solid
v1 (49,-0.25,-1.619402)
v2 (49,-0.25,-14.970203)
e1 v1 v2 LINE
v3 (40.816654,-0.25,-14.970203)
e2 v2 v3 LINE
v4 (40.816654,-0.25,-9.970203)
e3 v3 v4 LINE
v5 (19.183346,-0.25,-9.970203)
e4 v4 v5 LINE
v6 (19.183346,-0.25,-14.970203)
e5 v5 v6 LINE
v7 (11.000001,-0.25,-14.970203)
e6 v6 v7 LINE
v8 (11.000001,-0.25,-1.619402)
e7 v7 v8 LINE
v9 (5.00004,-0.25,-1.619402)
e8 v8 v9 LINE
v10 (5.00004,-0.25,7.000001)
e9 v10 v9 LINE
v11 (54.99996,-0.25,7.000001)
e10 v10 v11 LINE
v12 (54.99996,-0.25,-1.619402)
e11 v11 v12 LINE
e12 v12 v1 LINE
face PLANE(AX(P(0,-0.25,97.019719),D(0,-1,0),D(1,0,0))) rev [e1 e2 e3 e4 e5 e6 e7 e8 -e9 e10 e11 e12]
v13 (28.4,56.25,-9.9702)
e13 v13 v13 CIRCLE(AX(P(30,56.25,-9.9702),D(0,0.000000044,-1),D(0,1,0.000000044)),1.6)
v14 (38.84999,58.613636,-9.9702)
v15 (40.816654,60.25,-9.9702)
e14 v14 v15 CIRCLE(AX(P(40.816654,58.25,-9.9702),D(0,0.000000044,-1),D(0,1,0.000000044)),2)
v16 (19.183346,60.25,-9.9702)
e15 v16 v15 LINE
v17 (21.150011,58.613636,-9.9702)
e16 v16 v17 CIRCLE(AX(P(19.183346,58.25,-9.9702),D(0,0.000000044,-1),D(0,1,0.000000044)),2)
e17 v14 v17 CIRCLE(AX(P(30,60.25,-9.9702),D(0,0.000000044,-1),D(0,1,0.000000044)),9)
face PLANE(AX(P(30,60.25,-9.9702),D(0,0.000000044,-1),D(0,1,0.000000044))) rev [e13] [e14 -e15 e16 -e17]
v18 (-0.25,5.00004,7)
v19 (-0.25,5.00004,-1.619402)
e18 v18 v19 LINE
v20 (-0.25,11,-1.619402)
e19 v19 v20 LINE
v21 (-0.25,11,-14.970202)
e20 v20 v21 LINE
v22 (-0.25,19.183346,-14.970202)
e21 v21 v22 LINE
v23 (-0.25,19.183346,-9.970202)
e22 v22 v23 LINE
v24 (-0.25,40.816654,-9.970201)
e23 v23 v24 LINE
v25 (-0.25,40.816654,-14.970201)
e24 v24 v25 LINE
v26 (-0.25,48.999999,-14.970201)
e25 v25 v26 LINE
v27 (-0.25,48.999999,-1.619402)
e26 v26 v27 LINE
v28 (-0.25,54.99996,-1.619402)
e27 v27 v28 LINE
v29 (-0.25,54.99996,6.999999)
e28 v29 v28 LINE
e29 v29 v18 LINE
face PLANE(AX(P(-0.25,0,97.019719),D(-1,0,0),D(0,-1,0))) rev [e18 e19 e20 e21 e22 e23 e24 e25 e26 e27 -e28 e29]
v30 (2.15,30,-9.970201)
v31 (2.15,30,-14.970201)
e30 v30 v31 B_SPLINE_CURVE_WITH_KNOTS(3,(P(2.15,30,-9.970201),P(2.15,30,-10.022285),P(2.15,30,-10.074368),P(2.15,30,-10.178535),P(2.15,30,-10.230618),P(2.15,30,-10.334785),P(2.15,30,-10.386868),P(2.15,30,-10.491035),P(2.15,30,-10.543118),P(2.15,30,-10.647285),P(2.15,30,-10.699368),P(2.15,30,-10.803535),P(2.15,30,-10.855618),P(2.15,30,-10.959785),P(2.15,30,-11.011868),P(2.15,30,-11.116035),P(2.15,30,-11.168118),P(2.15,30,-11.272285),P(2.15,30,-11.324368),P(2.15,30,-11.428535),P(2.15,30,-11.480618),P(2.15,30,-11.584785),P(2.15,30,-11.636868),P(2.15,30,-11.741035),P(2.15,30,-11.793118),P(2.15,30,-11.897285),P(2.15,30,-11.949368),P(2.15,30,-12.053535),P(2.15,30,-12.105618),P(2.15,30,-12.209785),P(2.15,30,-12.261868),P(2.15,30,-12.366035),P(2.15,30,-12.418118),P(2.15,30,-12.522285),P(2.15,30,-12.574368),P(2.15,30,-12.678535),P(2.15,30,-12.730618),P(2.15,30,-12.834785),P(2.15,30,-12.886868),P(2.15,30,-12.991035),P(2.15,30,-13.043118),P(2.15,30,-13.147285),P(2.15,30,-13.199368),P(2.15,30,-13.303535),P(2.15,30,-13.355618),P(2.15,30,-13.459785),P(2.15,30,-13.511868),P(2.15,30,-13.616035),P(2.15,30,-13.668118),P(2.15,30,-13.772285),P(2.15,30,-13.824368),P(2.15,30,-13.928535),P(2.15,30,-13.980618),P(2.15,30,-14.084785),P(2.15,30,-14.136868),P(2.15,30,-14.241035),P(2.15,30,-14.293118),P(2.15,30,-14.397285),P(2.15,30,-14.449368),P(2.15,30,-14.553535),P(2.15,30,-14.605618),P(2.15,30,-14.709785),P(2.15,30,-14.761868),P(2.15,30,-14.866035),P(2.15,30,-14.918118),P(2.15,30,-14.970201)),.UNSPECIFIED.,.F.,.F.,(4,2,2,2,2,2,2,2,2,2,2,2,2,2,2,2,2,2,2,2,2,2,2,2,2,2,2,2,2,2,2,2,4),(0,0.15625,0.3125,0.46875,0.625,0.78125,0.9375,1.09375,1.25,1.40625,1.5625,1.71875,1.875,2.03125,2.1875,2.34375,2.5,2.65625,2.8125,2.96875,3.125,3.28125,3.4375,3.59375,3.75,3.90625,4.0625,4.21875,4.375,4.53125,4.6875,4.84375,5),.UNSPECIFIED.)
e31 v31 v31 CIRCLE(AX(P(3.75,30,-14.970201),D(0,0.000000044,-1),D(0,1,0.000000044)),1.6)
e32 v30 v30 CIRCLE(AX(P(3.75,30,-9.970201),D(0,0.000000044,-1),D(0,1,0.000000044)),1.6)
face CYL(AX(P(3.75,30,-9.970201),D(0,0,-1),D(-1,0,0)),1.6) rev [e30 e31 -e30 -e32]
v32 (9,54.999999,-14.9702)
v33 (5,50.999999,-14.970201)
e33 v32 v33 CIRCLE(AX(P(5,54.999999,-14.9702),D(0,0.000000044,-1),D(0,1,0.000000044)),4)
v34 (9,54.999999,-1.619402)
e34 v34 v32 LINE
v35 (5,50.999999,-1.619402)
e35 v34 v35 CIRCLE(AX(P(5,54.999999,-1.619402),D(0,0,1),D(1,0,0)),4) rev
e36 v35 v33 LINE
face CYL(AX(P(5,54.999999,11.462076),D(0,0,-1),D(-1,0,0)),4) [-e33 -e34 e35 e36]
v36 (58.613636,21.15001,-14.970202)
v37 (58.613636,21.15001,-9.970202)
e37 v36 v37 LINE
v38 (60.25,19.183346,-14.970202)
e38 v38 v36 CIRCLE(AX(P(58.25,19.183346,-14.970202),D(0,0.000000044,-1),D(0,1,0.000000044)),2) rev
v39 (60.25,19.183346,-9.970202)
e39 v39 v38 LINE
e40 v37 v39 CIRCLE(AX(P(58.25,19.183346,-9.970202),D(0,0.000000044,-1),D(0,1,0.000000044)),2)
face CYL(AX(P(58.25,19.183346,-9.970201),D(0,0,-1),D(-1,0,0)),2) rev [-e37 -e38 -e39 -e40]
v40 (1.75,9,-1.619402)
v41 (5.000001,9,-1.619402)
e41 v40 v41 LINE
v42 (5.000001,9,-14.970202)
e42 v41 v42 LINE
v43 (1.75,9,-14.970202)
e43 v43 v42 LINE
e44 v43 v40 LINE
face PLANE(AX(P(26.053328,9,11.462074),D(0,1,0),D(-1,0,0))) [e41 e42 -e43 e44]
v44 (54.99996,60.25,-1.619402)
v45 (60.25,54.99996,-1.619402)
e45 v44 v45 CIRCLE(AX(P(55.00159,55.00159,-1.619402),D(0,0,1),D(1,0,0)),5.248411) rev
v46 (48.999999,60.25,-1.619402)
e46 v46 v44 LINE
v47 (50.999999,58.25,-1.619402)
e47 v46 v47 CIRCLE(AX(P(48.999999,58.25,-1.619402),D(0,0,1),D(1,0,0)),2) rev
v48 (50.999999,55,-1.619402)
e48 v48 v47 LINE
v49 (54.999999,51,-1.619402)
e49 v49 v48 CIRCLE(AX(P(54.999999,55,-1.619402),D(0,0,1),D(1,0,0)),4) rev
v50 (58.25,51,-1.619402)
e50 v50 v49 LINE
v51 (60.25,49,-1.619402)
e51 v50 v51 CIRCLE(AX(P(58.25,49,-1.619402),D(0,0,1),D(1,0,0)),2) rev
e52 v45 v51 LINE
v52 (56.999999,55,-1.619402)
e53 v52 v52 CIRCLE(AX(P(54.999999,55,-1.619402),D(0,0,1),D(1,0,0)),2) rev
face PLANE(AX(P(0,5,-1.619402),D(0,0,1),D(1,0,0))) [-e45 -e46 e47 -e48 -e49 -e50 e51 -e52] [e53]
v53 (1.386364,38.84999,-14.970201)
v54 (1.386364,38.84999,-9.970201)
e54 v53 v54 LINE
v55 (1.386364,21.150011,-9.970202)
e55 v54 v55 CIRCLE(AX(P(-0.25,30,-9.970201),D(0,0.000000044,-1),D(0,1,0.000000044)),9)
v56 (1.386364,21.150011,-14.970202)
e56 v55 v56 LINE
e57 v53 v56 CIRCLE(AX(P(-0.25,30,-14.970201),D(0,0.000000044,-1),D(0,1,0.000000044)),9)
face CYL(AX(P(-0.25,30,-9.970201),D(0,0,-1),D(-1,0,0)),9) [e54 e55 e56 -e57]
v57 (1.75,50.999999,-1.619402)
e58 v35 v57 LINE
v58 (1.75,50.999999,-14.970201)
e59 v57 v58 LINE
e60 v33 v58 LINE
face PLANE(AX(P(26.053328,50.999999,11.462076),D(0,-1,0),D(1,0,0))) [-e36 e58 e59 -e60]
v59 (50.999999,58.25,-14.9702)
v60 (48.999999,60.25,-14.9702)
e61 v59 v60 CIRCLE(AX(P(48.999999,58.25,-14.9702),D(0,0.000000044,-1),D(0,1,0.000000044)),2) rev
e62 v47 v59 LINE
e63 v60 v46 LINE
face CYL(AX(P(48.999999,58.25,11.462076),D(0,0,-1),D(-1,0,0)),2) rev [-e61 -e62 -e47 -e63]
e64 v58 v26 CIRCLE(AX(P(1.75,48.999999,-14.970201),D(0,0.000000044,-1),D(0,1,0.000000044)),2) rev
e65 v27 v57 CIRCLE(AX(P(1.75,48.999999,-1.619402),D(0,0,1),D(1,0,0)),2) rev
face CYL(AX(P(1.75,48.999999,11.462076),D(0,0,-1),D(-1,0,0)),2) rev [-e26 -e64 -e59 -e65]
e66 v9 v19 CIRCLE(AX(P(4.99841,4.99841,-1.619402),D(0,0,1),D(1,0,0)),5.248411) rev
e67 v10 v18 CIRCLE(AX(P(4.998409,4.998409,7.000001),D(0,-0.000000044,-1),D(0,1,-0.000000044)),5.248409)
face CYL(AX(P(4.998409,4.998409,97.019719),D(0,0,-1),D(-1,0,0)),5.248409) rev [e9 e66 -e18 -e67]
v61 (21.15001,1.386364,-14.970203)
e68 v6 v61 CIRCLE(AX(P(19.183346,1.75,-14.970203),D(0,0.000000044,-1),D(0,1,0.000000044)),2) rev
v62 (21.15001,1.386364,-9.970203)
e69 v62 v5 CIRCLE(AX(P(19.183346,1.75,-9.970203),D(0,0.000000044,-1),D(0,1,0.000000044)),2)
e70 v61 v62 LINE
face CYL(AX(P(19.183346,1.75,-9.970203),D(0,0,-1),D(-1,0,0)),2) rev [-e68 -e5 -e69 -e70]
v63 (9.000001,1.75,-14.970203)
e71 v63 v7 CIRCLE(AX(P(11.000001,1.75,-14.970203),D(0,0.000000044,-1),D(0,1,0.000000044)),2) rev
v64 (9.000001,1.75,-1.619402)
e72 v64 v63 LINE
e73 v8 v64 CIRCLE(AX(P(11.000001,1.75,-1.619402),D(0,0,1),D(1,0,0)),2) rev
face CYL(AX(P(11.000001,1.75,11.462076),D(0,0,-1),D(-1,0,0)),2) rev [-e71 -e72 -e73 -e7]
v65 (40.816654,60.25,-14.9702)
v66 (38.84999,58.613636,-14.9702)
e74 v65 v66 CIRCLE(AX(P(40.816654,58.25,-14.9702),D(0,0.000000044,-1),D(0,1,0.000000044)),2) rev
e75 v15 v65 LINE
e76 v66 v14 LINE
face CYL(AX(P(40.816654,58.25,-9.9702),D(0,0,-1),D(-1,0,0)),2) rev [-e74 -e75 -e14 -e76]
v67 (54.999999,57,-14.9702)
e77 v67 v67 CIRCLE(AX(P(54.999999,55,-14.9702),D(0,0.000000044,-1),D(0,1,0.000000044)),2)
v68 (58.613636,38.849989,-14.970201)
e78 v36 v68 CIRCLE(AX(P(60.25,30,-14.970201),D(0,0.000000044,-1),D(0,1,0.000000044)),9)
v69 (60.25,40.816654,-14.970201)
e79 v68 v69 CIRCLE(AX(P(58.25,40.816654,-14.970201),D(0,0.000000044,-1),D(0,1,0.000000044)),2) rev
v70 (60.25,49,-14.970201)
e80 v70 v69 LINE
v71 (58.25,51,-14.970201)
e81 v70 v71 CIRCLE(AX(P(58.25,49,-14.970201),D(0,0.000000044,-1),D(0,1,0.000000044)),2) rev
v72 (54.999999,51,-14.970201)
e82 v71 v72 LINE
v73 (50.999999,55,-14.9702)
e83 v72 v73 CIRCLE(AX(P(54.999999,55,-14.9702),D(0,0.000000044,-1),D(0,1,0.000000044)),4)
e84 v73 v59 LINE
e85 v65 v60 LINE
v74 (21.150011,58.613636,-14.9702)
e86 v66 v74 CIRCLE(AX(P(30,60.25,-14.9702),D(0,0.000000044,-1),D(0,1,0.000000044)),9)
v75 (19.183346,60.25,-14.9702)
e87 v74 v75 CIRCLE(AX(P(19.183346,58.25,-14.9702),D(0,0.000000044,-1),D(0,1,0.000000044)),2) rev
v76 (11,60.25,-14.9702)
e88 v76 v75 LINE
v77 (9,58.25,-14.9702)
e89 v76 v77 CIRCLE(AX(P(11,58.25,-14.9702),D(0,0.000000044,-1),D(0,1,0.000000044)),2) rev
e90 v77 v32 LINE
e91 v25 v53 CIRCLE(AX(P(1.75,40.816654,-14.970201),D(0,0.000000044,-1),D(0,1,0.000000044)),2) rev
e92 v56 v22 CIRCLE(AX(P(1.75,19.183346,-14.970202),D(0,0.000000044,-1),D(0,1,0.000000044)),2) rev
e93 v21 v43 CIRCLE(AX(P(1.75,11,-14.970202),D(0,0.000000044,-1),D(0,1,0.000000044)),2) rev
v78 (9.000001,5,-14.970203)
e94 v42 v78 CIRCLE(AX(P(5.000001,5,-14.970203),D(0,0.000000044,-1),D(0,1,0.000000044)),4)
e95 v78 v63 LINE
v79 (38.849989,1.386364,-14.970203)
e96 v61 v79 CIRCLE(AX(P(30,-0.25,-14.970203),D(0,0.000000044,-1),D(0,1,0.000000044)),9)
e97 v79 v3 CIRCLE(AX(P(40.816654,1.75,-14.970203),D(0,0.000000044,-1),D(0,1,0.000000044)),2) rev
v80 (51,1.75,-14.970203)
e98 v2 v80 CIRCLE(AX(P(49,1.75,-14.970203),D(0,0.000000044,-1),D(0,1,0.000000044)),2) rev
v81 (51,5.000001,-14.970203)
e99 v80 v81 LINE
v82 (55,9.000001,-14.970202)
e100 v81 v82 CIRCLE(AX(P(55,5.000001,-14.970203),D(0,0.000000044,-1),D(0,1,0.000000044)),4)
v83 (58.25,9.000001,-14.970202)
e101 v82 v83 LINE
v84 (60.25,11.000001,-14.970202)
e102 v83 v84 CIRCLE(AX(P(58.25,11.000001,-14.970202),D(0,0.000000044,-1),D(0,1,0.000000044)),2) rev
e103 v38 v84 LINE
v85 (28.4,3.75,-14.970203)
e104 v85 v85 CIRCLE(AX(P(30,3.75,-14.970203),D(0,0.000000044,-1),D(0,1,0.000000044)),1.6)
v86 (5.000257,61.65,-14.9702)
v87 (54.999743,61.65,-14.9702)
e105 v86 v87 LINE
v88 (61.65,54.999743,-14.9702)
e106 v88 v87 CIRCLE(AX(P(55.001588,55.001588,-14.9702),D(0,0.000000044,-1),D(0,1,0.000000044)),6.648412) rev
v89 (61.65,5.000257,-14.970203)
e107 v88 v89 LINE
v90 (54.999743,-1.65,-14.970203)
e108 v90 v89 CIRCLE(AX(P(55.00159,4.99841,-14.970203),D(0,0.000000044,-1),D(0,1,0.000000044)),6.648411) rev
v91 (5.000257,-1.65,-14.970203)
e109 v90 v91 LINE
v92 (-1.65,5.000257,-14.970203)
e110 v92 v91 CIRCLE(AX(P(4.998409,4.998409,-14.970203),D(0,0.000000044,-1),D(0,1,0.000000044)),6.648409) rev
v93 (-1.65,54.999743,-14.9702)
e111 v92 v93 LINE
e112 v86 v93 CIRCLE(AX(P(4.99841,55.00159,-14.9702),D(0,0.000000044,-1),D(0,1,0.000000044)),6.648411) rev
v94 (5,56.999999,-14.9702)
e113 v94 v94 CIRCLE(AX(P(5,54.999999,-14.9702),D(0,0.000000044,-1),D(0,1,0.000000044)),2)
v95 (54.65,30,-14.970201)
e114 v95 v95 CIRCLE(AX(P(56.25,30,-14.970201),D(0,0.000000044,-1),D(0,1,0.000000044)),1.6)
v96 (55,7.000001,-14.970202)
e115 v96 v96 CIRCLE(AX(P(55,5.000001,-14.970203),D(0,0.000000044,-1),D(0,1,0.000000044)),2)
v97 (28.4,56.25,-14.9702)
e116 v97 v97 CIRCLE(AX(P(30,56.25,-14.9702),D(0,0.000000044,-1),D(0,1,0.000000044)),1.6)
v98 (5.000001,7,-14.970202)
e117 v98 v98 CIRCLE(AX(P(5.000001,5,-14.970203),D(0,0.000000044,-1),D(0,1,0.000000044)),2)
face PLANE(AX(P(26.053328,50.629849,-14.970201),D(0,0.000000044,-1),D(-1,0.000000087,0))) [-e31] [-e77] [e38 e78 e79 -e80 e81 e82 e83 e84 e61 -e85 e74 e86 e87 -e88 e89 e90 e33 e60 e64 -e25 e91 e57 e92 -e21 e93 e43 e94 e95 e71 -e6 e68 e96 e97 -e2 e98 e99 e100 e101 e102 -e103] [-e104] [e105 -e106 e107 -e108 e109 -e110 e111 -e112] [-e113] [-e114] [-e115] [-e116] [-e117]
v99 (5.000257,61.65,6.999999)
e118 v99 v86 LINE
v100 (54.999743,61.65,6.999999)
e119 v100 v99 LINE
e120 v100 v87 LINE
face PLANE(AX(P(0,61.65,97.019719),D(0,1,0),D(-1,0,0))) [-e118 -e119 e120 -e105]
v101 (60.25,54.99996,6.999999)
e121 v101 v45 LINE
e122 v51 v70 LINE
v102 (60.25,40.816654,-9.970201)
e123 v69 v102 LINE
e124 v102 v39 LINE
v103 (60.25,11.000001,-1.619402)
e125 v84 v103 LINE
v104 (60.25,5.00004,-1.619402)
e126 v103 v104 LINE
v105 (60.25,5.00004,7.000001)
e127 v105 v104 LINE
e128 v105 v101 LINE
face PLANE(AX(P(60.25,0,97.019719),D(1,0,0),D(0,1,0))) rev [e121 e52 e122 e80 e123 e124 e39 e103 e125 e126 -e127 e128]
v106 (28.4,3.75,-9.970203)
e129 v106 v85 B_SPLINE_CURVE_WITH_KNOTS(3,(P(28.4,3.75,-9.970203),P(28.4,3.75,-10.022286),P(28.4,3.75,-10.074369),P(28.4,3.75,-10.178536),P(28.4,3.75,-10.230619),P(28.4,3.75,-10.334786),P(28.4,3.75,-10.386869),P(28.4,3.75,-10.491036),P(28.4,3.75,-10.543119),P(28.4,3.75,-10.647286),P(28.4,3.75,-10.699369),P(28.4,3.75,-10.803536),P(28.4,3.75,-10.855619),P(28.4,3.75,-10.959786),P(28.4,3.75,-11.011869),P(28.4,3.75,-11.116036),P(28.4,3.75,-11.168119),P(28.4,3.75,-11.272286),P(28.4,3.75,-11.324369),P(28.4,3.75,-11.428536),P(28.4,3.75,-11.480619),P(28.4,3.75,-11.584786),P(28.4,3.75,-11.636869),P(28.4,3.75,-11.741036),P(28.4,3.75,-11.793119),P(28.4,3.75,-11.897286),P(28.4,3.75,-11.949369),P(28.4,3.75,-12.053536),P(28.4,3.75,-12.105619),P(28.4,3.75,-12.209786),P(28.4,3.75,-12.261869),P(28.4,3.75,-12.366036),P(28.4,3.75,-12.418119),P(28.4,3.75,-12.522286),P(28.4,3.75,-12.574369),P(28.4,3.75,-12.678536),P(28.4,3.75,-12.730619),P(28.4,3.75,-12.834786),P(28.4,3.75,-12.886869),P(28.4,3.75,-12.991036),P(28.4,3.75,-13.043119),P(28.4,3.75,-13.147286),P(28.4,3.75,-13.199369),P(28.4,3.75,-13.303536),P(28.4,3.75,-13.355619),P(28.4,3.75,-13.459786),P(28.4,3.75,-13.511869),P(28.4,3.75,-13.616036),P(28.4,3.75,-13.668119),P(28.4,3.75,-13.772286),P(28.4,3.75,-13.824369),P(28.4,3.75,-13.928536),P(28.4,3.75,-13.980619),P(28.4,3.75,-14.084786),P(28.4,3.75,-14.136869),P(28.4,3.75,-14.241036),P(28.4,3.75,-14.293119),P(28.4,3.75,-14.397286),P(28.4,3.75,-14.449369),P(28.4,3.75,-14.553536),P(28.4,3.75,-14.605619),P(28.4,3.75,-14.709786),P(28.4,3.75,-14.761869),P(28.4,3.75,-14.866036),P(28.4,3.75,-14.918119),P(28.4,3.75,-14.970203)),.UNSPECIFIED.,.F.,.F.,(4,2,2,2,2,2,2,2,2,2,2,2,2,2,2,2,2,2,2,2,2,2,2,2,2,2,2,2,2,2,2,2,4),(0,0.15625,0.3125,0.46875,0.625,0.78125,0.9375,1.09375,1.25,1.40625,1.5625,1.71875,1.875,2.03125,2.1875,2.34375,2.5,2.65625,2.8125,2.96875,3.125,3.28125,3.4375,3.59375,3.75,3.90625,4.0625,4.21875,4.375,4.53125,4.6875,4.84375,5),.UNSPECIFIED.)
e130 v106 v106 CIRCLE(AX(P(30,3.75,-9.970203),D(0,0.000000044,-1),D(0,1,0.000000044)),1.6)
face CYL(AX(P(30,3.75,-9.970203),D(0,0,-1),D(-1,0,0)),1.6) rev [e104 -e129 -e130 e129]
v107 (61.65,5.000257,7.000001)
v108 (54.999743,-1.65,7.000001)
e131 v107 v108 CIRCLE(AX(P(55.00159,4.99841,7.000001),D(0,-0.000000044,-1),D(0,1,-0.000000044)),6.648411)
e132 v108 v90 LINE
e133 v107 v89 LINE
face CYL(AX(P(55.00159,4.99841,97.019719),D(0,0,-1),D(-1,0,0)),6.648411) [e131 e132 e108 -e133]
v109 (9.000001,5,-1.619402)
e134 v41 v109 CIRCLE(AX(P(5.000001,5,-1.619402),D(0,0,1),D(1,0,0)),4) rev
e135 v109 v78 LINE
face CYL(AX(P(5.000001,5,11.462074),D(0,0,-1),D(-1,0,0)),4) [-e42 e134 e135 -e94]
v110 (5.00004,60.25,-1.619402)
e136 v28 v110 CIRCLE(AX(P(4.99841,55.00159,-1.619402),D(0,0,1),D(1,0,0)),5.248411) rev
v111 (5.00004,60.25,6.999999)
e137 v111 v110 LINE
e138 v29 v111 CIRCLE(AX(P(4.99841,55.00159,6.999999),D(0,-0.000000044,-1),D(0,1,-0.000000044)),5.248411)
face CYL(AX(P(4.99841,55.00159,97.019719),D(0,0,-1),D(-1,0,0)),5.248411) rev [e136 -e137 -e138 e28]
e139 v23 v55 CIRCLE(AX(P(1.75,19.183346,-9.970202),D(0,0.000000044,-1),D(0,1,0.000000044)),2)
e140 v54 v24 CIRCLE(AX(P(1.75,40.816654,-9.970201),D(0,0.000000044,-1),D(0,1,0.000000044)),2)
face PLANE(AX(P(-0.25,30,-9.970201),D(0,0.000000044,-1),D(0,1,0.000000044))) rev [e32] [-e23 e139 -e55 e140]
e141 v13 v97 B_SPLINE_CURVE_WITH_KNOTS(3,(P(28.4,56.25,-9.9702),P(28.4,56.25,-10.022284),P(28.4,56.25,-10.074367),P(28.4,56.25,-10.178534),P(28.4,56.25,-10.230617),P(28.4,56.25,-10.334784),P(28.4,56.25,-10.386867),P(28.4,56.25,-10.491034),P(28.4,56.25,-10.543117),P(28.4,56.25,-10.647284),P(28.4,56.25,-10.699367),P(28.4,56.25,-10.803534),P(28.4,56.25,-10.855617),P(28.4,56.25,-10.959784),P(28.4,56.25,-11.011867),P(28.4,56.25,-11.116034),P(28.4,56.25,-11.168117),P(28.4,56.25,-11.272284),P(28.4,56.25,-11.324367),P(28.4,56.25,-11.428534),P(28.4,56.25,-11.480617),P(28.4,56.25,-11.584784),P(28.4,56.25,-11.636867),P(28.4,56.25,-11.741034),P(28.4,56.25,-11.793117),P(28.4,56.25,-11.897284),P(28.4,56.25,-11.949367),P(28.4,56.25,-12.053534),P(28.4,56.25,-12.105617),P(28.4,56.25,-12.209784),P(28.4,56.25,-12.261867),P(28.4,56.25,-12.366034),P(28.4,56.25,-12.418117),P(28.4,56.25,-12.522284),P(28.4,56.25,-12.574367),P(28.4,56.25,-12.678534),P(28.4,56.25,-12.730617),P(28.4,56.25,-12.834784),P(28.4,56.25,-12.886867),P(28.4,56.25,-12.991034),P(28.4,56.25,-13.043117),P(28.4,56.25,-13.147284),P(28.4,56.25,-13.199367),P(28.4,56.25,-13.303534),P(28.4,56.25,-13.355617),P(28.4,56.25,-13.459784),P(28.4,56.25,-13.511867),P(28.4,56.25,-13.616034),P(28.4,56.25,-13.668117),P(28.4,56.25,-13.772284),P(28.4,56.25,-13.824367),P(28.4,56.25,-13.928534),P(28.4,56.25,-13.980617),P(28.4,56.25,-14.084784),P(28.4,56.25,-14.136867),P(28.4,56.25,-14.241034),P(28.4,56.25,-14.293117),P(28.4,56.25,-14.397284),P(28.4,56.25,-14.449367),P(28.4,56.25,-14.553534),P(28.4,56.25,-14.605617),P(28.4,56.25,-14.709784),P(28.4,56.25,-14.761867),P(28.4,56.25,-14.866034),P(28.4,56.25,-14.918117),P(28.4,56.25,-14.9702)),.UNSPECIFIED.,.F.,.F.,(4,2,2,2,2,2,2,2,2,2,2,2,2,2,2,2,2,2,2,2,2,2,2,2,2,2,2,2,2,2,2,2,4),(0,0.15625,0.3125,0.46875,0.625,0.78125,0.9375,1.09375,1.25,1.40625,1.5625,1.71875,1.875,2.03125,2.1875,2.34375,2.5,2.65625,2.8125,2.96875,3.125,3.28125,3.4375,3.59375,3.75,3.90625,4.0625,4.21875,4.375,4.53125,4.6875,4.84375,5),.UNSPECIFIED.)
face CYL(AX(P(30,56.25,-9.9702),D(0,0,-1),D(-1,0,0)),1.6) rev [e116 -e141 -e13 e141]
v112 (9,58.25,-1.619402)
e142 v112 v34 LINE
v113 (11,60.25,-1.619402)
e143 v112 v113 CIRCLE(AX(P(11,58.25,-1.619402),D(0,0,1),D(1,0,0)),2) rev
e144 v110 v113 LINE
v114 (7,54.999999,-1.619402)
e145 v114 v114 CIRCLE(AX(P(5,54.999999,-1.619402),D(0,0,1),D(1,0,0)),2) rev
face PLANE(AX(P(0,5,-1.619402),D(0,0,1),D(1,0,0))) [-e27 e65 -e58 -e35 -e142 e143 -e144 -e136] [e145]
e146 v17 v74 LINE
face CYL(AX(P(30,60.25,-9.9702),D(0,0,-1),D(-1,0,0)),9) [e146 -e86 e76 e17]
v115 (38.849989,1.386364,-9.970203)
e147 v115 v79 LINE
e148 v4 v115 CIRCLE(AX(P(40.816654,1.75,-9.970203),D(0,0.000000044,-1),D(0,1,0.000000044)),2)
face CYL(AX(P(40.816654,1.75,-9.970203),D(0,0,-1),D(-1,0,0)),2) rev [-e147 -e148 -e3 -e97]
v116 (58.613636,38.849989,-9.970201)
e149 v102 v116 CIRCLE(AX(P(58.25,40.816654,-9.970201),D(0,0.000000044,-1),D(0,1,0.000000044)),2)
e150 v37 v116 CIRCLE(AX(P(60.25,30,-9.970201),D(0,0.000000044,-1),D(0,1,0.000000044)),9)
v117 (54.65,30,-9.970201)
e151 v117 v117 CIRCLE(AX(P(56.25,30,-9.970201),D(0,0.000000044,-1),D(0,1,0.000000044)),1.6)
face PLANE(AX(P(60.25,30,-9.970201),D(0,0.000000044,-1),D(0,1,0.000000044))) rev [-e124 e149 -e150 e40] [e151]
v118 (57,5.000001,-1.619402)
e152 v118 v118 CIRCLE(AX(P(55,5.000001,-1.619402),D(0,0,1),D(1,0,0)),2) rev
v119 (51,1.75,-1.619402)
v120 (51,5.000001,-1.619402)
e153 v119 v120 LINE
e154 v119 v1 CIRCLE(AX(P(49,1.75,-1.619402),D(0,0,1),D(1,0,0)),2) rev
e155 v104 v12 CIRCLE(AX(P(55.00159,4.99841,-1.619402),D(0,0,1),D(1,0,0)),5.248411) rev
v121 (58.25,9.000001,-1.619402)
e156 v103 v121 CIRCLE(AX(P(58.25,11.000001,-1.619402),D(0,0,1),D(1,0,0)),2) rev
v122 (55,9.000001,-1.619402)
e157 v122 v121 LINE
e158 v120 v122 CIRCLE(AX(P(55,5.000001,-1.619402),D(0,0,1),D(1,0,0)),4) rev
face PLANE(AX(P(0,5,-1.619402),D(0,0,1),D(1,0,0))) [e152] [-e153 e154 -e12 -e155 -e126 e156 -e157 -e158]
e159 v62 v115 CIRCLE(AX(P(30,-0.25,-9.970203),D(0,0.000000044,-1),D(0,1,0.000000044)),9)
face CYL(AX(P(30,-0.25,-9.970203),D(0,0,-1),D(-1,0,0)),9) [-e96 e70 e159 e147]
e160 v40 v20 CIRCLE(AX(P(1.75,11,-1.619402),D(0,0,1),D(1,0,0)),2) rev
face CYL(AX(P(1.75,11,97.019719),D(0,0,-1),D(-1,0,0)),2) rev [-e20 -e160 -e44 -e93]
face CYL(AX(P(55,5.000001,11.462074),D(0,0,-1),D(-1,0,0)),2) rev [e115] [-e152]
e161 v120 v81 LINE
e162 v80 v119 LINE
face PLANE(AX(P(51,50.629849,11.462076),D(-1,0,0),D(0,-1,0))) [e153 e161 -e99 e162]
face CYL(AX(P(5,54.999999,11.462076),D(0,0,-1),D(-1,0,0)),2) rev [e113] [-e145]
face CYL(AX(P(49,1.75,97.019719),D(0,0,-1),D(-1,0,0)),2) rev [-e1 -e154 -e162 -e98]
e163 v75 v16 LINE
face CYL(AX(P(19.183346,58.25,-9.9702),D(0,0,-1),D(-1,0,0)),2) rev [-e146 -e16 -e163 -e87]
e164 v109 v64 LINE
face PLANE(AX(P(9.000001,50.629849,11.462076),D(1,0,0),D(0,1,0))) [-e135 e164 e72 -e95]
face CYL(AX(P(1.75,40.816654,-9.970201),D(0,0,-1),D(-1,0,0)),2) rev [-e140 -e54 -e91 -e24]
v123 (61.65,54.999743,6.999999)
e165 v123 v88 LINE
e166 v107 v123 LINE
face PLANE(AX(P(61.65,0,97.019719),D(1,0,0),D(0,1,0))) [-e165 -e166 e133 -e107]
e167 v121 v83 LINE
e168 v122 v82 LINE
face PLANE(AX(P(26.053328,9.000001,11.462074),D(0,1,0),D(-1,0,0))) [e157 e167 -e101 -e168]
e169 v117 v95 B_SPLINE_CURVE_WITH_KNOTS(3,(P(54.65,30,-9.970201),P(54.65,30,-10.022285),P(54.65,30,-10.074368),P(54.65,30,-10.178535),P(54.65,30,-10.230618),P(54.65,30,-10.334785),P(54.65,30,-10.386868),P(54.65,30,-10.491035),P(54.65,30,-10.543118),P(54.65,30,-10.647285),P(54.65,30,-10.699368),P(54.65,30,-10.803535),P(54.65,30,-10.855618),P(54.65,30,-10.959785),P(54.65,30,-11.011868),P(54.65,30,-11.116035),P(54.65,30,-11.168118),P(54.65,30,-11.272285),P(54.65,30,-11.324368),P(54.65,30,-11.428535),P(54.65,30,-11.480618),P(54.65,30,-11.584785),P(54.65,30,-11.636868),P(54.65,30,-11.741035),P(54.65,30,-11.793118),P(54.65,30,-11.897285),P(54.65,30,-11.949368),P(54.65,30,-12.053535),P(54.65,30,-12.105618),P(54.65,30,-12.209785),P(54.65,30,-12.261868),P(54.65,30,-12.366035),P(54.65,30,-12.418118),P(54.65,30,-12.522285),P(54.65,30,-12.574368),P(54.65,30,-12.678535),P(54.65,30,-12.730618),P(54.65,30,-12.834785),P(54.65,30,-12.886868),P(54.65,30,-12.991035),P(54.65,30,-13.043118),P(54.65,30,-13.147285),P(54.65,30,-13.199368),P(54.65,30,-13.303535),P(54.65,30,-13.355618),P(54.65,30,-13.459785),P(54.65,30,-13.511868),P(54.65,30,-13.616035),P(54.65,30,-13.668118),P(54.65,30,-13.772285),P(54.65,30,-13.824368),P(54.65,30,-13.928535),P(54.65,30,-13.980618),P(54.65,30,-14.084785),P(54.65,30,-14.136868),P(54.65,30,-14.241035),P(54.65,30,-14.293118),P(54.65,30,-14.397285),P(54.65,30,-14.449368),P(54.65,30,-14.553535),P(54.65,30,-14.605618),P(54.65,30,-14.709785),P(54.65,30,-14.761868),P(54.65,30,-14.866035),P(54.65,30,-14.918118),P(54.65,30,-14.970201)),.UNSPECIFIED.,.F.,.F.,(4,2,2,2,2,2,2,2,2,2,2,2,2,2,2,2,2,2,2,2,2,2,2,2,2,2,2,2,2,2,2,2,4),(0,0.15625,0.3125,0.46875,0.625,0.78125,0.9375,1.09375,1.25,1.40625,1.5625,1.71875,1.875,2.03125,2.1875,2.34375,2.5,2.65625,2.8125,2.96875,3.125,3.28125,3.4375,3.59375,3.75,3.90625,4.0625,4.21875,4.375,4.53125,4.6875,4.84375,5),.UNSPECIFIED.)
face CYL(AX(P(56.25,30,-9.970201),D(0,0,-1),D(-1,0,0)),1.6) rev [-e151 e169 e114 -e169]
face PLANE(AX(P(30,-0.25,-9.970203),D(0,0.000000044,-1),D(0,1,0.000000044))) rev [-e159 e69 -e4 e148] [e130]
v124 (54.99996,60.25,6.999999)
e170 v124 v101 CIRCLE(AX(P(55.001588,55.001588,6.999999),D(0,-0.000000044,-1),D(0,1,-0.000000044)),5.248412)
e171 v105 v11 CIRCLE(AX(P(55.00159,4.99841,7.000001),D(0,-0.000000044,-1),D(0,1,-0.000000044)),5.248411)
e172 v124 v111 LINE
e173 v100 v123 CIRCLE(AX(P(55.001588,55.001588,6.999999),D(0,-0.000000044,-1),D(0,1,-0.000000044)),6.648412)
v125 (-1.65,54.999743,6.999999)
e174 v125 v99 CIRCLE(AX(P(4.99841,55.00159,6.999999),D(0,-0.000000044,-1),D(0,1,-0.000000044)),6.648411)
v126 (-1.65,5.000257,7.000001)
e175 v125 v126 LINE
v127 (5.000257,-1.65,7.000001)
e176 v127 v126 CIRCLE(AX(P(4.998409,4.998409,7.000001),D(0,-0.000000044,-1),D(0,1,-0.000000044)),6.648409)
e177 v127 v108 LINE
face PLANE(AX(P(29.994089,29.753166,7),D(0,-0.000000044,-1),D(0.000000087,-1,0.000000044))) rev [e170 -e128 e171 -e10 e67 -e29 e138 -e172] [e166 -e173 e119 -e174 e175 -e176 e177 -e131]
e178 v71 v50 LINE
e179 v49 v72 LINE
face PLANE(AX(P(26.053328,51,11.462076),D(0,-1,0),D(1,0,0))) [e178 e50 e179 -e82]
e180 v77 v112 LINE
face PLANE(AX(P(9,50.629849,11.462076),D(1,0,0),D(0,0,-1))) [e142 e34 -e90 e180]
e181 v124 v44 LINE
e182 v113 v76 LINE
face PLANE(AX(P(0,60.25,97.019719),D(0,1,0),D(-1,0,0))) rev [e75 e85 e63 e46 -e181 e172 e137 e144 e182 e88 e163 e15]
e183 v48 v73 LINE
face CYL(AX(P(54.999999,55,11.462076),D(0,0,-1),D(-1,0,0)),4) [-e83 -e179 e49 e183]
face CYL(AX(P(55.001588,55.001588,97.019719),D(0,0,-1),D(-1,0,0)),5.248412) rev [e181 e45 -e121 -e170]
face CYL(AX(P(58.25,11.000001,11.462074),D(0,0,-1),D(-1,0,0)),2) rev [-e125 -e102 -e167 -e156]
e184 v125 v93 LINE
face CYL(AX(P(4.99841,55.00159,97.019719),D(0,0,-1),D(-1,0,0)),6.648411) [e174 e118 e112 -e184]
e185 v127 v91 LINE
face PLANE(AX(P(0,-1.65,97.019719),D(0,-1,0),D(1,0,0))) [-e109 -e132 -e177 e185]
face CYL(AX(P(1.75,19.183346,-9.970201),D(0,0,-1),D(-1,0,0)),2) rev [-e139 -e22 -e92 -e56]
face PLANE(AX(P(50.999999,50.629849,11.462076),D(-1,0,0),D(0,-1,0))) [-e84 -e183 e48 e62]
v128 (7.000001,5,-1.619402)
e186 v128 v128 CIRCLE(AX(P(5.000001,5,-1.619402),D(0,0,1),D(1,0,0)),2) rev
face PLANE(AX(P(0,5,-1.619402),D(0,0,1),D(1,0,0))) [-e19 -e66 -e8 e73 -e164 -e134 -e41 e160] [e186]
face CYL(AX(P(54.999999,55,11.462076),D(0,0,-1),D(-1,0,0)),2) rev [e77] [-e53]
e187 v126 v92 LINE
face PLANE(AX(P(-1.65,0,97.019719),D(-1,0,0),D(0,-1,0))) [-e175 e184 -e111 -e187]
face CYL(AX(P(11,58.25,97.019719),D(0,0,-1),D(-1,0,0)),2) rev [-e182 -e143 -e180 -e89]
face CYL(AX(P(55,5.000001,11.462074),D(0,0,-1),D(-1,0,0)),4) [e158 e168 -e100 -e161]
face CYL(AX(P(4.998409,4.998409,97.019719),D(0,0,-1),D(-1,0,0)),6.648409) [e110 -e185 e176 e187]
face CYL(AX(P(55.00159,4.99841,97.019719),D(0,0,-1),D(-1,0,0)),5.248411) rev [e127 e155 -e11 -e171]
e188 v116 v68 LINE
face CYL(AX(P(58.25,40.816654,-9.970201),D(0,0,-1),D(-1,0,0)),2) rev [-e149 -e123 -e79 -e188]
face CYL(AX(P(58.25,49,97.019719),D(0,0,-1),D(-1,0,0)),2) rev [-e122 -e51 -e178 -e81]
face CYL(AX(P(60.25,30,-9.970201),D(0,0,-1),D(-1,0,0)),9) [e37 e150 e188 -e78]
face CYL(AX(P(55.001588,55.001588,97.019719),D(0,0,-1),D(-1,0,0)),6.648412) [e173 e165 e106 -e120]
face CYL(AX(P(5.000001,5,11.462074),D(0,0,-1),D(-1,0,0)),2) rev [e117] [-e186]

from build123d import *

# Parameters (mm, degrees)
BOSS_EXTRUDE1_DEPTH      = 7
BOSS_EXTRUDE1_DEPTH_BACK = 14.970201
BOSS_EXTRUDE2_START      = -14.970201
SKETCH2_R                = 2
BOSS_EXTRUDE2_DEPTH      = 13.350798149
BOSS_EXTRUDE3_START      = -14.970203
SKETCH3_R                = 1.6
BOSS_EXTRUDE3_DEPTH      = 5.000003
FILLET1_R                = 2


with BuildPart() as part:
    # Sketch1 → Boss-Extrude1 (new, two sides: drawn at the far end of the back side and taken through both)
    with BuildSketch(Plane.XY.offset(-BOSS_EXTRUDE1_DEPTH_BACK)):
        with BuildLine():
            Line((54.999742941, -1.649999966), (5.000257256, -1.649999966))
            ThreePointArc((5.000257256, -1.649999966), (0.297273819, 0.297273819), (-1.649999966, 5.000257256))
            Line((-1.649999966, 5.000257256), (-1.649999966, 54.999742941))
            ThreePointArc((-1.649999966, 54.999742941), (0.297274177, 59.702725823), (5.000257059, 61.649999966))
            Line((5.000257059, 61.649999966), (54.999743139, 61.649999966))
            ThreePointArc((54.999743139, 61.649999966), (59.702725466, 59.702725466), (61.649999966, 54.999743139))
            Line((61.649999966, 54.999743139), (61.649999966, 5.000257059))
            ThreePointArc((61.649999966, 5.000257059), (59.702725823, 0.297274177), (54.999742941, -1.649999966))
        make_face()
        with BuildLine():
            ThreePointArc((5.000039752, 60.249999994), (1.287223653, 58.712776347), (-0.249999994, 54.999960248))
            Line((-0.249999994, 54.999960248), (-0.249999994, 5.000039782))
            ThreePointArc((-0.249999994, 5.000039782), (1.287223296, 1.287223296), (5.000039782, -0.249999994))
            Line((5.000039782, -0.249999994), (54.999960248, -0.249999994))
            ThreePointArc((54.999960248, -0.249999994), (58.712776347, 1.287223653), (60.249999994, 5.000039752))
            Line((60.249999994, 5.000039752), (60.249999994, 54.999960279))
            ThreePointArc((60.249999994, 54.999960279), (58.712775989, 58.712775989), (54.999960279, 60.249999994))
            Line((54.999960279, 60.249999994), (5.000039752, 60.249999994))
        make_face(mode=Mode.SUBTRACT)
    extrude(amount=BOSS_EXTRUDE1_DEPTH + BOSS_EXTRUDE1_DEPTH_BACK)


with BuildPart() as boss_extrude2_tool:
    # Sketch2 → Boss-Extrude2 (new body)
    # profile 1 of 4: a face of its own
    with BuildSketch(Plane.XY.offset(BOSS_EXTRUDE2_START)):
        with BuildLine():
            Line((9.00000016, 54.99999922), (9.00000016, 60.249999994))
            Line((9.00000016, 60.249999994), (5.000039752, 60.249999994))
            add(Edge.make_bspline(
                [(-0.249999994, 54.999960248), (-0.250954892, 58.075921633), (1.924078367, 60.250954892), (5.000039752, 60.249999994)],
                knots=[0, 0, 0, 0, 1, 1, 1, 1], degree=3, weights=[1, 0.804591489, 0.804591489, 1]))
            Line((-0.249999994, 54.999960248), (-0.249999994, 50.99999922))
            Line((-0.249999994, 50.99999922), (5.00000016, 50.99999922))
            ThreePointArc((5.00000016, 50.99999922), (7.828427285, 52.171572095), (9.00000016, 54.99999922))
        make_face()
        with Locations(Location((5.00000016, 54.99999922, 0), (0, 0, 90))):
            Circle(SKETCH2_R, mode=Mode.SUBTRACT)
    # profile 2 of 4: a face of its own
    with BuildSketch(Plane.XY.offset(BOSS_EXTRUDE2_START)):
        with BuildLine():
            Line((50.99999922, 54.99999984), (50.99999922, 60.249999994))
            Line((50.99999922, 60.249999994), (54.999960248, 60.249999994))
            add(Edge.make_bspline(
                [(54.999960248, 60.249999994), (58.075921633, 60.250954892), (60.250954892, 58.075921633), (60.249999994, 54.999960248)],
                knots=[0, 0, 0, 0, 1, 1, 1, 1], degree=3, weights=[1, 0.804591489, 0.804591489, 1]))
            Line((60.249999994, 54.999960248), (60.249999994, 50.99999984))
            Line((60.249999994, 50.99999984), (54.99999922, 50.99999984))
            ThreePointArc((54.99999922, 50.99999984), (52.171572095, 52.171572715), (50.99999922, 54.99999984))
        make_face()
        with Locations(Location((54.99999922, 54.99999984, 0), (0, 0, 90))):
            Circle(SKETCH2_R, mode=Mode.SUBTRACT)
    # profile 3 of 4: a face of its own
    with BuildSketch(Plane.XY.offset(BOSS_EXTRUDE2_START)):
        with BuildLine():
            Line((54.99999984, 9.00000078), (60.249999994, 9.00000078))
            Line((60.249999994, 9.00000078), (60.249999994, 5.000039752))
            add(Edge.make_bspline(
                [(60.249999994, 5.000039752), (60.250954892, 1.924078367), (58.075921633, -0.250954892), (54.999960248, -0.249999994)],
                knots=[0, 0, 0, 0, 1, 1, 1, 1], degree=3, weights=[1, 0.804591489, 0.804591489, 1]))
            Line((54.999960248, -0.249999994), (50.99999984, -0.249999994))
            Line((50.99999984, -0.249999994), (50.99999984, 5.00000078))
            ThreePointArc((50.99999984, 5.00000078), (52.171572715, 7.828427905), (54.99999984, 9.00000078))
        make_face()
        with Locations(Location((54.99999984, 5.00000078, 0), (0, 0, 90))):
            Circle(SKETCH2_R, mode=Mode.SUBTRACT)
    # profile 4 of 4: a face of its own
    with BuildSketch(Plane.XY.offset(BOSS_EXTRUDE2_START)):
        with BuildLine():
            Line((9.00000078, 5.00000016), (9.00000078, -0.249999994))
            Line((9.00000078, -0.249999994), (5.000039752, -0.249999994))
            add(Edge.make_bspline(
                [(5.000039752, -0.249999994), (1.924078367, -0.250954892), (-0.250954892, 1.924078367), (-0.249999994, 5.000039752)],
                knots=[0, 0, 0, 0, 1, 1, 1, 1], degree=3, weights=[1, 0.804591489, 0.804591489, 1]))
            Line((-0.249999994, 5.000039752), (-0.249999994, 9.00000016))
            Line((-0.249999994, 9.00000016), (5.00000078, 9.00000016))
            ThreePointArc((5.00000078, 9.00000016), (7.828427905, 7.828427285), (9.00000078, 5.00000016))
        make_face()
        with Locations(Location((5.00000078, 5.00000016, 0), (0, 0, 90))):
            Circle(SKETCH2_R, mode=Mode.SUBTRACT)
    extrude(amount=BOSS_EXTRUDE2_DEPTH)


with BuildPart() as part_1:
    add(part.part)


with BuildPart() as part_2:
    # Boss-Extrude2: joined with boss_extrude2_tool
    add(part_1.part.fuse(boss_extrude2_tool.part, tol=0.00001))

    # Sketch3 → Boss-Extrude3 (add)
    # profile 1 of 4: a face of its own
    with BuildSketch(Plane.XY.offset(BOSS_EXTRUDE3_START)):
        with BuildLine():
            Line((60.249999994, 20.999999985), (60.249999994, 38.999999985))
            ThreePointArc((60.249999994, 38.999999985), (51.249999994, 29.999999985), (60.249999994, 20.999999985))
        make_face()
        with Locations(Location((56.249999994, 29.999999985, 0), (0, 0, 180))):
            Circle(SKETCH3_R, mode=Mode.SUBTRACT)
    # profile 2 of 4: a face of its own
    with BuildSketch(Plane.XY.offset(BOSS_EXTRUDE3_START)):
        with BuildLine():
            Line((39.000000015, 60.249999994), (21.000000015, 60.249999994))
            ThreePointArc((21.000000015, 60.249999994), (30.000000015, 51.249999994), (39.000000015, 60.249999994))
        make_face()
        with Locations(Location((30.000000015, 56.249999994, 0), (0, 0, 180))):
            Circle(SKETCH3_R, mode=Mode.SUBTRACT)
    # profile 3 of 4: a face of its own
    with BuildSketch(Plane.XY.offset(BOSS_EXTRUDE3_START)):
        with BuildLine():
            Line((20.999999985, -0.249999994), (38.999999985, -0.249999994))
            ThreePointArc((38.999999985, -0.249999994), (29.999999985, 8.750000006), (20.999999985, -0.249999994))
        make_face()
        with Locations(Location((29.999999985, 3.750000006, 0), (0, 0, 180))):
            Circle(SKETCH3_R, mode=Mode.SUBTRACT)
    # profile 4 of 4: a face of its own
    with BuildSketch(Plane.XY.offset(BOSS_EXTRUDE3_START)):
        with BuildLine():
            Line((-0.249999994, 39.000000015), (-0.249999994, 21.000000015))
            ThreePointArc((-0.249999994, 21.000000015), (8.750000006, 30.000000015), (-0.249999994, 39.000000015))
        make_face()
        with Locations(Location((3.750000006, 30.000000015, 0), (0, 0, 180))):
            Circle(SKETCH3_R, mode=Mode.SUBTRACT)
    extrude(amount=BOSS_EXTRUDE3_DEPTH)

    # Fillet1
    fillet1_edges = [part_2.edges().sort_by_distance(p)[0] for p in [
        (-0.249999994, 50.99999922, -8.294801925),
        (9.00000016, 60.249999994, -8.294801925),
        (50.99999922, 60.249999994, -8.294801925),
        (60.249999994, 50.99999984, -8.294801925),
        (60.249999994, 9.00000078, -8.294801925),
        (50.99999984, -0.249999994, -8.294801925),
        (9.00000078, -0.249999994, -8.294801925),
        (-0.249999994, 9.00000016, -8.294801925),
        (21.000000015, 60.249999994, -12.4702005),
        (39.000000015, 60.249999994, -12.4702005),
        (60.249999994, 38.999999985, -12.4702005),
        (60.249999994, 20.999999985, -12.4702005),
        (38.999999985, -0.249999994, -12.4702005),
        (20.999999985, -0.249999994, -12.4702005),
        (-0.249999994, 21.000000015, -12.4702005),
        (-0.249999994, 39.000000015, -12.4702005),
    ]]
    fillet(fillet1_edges, radius=FILLET1_R)


solid = part_2.part
